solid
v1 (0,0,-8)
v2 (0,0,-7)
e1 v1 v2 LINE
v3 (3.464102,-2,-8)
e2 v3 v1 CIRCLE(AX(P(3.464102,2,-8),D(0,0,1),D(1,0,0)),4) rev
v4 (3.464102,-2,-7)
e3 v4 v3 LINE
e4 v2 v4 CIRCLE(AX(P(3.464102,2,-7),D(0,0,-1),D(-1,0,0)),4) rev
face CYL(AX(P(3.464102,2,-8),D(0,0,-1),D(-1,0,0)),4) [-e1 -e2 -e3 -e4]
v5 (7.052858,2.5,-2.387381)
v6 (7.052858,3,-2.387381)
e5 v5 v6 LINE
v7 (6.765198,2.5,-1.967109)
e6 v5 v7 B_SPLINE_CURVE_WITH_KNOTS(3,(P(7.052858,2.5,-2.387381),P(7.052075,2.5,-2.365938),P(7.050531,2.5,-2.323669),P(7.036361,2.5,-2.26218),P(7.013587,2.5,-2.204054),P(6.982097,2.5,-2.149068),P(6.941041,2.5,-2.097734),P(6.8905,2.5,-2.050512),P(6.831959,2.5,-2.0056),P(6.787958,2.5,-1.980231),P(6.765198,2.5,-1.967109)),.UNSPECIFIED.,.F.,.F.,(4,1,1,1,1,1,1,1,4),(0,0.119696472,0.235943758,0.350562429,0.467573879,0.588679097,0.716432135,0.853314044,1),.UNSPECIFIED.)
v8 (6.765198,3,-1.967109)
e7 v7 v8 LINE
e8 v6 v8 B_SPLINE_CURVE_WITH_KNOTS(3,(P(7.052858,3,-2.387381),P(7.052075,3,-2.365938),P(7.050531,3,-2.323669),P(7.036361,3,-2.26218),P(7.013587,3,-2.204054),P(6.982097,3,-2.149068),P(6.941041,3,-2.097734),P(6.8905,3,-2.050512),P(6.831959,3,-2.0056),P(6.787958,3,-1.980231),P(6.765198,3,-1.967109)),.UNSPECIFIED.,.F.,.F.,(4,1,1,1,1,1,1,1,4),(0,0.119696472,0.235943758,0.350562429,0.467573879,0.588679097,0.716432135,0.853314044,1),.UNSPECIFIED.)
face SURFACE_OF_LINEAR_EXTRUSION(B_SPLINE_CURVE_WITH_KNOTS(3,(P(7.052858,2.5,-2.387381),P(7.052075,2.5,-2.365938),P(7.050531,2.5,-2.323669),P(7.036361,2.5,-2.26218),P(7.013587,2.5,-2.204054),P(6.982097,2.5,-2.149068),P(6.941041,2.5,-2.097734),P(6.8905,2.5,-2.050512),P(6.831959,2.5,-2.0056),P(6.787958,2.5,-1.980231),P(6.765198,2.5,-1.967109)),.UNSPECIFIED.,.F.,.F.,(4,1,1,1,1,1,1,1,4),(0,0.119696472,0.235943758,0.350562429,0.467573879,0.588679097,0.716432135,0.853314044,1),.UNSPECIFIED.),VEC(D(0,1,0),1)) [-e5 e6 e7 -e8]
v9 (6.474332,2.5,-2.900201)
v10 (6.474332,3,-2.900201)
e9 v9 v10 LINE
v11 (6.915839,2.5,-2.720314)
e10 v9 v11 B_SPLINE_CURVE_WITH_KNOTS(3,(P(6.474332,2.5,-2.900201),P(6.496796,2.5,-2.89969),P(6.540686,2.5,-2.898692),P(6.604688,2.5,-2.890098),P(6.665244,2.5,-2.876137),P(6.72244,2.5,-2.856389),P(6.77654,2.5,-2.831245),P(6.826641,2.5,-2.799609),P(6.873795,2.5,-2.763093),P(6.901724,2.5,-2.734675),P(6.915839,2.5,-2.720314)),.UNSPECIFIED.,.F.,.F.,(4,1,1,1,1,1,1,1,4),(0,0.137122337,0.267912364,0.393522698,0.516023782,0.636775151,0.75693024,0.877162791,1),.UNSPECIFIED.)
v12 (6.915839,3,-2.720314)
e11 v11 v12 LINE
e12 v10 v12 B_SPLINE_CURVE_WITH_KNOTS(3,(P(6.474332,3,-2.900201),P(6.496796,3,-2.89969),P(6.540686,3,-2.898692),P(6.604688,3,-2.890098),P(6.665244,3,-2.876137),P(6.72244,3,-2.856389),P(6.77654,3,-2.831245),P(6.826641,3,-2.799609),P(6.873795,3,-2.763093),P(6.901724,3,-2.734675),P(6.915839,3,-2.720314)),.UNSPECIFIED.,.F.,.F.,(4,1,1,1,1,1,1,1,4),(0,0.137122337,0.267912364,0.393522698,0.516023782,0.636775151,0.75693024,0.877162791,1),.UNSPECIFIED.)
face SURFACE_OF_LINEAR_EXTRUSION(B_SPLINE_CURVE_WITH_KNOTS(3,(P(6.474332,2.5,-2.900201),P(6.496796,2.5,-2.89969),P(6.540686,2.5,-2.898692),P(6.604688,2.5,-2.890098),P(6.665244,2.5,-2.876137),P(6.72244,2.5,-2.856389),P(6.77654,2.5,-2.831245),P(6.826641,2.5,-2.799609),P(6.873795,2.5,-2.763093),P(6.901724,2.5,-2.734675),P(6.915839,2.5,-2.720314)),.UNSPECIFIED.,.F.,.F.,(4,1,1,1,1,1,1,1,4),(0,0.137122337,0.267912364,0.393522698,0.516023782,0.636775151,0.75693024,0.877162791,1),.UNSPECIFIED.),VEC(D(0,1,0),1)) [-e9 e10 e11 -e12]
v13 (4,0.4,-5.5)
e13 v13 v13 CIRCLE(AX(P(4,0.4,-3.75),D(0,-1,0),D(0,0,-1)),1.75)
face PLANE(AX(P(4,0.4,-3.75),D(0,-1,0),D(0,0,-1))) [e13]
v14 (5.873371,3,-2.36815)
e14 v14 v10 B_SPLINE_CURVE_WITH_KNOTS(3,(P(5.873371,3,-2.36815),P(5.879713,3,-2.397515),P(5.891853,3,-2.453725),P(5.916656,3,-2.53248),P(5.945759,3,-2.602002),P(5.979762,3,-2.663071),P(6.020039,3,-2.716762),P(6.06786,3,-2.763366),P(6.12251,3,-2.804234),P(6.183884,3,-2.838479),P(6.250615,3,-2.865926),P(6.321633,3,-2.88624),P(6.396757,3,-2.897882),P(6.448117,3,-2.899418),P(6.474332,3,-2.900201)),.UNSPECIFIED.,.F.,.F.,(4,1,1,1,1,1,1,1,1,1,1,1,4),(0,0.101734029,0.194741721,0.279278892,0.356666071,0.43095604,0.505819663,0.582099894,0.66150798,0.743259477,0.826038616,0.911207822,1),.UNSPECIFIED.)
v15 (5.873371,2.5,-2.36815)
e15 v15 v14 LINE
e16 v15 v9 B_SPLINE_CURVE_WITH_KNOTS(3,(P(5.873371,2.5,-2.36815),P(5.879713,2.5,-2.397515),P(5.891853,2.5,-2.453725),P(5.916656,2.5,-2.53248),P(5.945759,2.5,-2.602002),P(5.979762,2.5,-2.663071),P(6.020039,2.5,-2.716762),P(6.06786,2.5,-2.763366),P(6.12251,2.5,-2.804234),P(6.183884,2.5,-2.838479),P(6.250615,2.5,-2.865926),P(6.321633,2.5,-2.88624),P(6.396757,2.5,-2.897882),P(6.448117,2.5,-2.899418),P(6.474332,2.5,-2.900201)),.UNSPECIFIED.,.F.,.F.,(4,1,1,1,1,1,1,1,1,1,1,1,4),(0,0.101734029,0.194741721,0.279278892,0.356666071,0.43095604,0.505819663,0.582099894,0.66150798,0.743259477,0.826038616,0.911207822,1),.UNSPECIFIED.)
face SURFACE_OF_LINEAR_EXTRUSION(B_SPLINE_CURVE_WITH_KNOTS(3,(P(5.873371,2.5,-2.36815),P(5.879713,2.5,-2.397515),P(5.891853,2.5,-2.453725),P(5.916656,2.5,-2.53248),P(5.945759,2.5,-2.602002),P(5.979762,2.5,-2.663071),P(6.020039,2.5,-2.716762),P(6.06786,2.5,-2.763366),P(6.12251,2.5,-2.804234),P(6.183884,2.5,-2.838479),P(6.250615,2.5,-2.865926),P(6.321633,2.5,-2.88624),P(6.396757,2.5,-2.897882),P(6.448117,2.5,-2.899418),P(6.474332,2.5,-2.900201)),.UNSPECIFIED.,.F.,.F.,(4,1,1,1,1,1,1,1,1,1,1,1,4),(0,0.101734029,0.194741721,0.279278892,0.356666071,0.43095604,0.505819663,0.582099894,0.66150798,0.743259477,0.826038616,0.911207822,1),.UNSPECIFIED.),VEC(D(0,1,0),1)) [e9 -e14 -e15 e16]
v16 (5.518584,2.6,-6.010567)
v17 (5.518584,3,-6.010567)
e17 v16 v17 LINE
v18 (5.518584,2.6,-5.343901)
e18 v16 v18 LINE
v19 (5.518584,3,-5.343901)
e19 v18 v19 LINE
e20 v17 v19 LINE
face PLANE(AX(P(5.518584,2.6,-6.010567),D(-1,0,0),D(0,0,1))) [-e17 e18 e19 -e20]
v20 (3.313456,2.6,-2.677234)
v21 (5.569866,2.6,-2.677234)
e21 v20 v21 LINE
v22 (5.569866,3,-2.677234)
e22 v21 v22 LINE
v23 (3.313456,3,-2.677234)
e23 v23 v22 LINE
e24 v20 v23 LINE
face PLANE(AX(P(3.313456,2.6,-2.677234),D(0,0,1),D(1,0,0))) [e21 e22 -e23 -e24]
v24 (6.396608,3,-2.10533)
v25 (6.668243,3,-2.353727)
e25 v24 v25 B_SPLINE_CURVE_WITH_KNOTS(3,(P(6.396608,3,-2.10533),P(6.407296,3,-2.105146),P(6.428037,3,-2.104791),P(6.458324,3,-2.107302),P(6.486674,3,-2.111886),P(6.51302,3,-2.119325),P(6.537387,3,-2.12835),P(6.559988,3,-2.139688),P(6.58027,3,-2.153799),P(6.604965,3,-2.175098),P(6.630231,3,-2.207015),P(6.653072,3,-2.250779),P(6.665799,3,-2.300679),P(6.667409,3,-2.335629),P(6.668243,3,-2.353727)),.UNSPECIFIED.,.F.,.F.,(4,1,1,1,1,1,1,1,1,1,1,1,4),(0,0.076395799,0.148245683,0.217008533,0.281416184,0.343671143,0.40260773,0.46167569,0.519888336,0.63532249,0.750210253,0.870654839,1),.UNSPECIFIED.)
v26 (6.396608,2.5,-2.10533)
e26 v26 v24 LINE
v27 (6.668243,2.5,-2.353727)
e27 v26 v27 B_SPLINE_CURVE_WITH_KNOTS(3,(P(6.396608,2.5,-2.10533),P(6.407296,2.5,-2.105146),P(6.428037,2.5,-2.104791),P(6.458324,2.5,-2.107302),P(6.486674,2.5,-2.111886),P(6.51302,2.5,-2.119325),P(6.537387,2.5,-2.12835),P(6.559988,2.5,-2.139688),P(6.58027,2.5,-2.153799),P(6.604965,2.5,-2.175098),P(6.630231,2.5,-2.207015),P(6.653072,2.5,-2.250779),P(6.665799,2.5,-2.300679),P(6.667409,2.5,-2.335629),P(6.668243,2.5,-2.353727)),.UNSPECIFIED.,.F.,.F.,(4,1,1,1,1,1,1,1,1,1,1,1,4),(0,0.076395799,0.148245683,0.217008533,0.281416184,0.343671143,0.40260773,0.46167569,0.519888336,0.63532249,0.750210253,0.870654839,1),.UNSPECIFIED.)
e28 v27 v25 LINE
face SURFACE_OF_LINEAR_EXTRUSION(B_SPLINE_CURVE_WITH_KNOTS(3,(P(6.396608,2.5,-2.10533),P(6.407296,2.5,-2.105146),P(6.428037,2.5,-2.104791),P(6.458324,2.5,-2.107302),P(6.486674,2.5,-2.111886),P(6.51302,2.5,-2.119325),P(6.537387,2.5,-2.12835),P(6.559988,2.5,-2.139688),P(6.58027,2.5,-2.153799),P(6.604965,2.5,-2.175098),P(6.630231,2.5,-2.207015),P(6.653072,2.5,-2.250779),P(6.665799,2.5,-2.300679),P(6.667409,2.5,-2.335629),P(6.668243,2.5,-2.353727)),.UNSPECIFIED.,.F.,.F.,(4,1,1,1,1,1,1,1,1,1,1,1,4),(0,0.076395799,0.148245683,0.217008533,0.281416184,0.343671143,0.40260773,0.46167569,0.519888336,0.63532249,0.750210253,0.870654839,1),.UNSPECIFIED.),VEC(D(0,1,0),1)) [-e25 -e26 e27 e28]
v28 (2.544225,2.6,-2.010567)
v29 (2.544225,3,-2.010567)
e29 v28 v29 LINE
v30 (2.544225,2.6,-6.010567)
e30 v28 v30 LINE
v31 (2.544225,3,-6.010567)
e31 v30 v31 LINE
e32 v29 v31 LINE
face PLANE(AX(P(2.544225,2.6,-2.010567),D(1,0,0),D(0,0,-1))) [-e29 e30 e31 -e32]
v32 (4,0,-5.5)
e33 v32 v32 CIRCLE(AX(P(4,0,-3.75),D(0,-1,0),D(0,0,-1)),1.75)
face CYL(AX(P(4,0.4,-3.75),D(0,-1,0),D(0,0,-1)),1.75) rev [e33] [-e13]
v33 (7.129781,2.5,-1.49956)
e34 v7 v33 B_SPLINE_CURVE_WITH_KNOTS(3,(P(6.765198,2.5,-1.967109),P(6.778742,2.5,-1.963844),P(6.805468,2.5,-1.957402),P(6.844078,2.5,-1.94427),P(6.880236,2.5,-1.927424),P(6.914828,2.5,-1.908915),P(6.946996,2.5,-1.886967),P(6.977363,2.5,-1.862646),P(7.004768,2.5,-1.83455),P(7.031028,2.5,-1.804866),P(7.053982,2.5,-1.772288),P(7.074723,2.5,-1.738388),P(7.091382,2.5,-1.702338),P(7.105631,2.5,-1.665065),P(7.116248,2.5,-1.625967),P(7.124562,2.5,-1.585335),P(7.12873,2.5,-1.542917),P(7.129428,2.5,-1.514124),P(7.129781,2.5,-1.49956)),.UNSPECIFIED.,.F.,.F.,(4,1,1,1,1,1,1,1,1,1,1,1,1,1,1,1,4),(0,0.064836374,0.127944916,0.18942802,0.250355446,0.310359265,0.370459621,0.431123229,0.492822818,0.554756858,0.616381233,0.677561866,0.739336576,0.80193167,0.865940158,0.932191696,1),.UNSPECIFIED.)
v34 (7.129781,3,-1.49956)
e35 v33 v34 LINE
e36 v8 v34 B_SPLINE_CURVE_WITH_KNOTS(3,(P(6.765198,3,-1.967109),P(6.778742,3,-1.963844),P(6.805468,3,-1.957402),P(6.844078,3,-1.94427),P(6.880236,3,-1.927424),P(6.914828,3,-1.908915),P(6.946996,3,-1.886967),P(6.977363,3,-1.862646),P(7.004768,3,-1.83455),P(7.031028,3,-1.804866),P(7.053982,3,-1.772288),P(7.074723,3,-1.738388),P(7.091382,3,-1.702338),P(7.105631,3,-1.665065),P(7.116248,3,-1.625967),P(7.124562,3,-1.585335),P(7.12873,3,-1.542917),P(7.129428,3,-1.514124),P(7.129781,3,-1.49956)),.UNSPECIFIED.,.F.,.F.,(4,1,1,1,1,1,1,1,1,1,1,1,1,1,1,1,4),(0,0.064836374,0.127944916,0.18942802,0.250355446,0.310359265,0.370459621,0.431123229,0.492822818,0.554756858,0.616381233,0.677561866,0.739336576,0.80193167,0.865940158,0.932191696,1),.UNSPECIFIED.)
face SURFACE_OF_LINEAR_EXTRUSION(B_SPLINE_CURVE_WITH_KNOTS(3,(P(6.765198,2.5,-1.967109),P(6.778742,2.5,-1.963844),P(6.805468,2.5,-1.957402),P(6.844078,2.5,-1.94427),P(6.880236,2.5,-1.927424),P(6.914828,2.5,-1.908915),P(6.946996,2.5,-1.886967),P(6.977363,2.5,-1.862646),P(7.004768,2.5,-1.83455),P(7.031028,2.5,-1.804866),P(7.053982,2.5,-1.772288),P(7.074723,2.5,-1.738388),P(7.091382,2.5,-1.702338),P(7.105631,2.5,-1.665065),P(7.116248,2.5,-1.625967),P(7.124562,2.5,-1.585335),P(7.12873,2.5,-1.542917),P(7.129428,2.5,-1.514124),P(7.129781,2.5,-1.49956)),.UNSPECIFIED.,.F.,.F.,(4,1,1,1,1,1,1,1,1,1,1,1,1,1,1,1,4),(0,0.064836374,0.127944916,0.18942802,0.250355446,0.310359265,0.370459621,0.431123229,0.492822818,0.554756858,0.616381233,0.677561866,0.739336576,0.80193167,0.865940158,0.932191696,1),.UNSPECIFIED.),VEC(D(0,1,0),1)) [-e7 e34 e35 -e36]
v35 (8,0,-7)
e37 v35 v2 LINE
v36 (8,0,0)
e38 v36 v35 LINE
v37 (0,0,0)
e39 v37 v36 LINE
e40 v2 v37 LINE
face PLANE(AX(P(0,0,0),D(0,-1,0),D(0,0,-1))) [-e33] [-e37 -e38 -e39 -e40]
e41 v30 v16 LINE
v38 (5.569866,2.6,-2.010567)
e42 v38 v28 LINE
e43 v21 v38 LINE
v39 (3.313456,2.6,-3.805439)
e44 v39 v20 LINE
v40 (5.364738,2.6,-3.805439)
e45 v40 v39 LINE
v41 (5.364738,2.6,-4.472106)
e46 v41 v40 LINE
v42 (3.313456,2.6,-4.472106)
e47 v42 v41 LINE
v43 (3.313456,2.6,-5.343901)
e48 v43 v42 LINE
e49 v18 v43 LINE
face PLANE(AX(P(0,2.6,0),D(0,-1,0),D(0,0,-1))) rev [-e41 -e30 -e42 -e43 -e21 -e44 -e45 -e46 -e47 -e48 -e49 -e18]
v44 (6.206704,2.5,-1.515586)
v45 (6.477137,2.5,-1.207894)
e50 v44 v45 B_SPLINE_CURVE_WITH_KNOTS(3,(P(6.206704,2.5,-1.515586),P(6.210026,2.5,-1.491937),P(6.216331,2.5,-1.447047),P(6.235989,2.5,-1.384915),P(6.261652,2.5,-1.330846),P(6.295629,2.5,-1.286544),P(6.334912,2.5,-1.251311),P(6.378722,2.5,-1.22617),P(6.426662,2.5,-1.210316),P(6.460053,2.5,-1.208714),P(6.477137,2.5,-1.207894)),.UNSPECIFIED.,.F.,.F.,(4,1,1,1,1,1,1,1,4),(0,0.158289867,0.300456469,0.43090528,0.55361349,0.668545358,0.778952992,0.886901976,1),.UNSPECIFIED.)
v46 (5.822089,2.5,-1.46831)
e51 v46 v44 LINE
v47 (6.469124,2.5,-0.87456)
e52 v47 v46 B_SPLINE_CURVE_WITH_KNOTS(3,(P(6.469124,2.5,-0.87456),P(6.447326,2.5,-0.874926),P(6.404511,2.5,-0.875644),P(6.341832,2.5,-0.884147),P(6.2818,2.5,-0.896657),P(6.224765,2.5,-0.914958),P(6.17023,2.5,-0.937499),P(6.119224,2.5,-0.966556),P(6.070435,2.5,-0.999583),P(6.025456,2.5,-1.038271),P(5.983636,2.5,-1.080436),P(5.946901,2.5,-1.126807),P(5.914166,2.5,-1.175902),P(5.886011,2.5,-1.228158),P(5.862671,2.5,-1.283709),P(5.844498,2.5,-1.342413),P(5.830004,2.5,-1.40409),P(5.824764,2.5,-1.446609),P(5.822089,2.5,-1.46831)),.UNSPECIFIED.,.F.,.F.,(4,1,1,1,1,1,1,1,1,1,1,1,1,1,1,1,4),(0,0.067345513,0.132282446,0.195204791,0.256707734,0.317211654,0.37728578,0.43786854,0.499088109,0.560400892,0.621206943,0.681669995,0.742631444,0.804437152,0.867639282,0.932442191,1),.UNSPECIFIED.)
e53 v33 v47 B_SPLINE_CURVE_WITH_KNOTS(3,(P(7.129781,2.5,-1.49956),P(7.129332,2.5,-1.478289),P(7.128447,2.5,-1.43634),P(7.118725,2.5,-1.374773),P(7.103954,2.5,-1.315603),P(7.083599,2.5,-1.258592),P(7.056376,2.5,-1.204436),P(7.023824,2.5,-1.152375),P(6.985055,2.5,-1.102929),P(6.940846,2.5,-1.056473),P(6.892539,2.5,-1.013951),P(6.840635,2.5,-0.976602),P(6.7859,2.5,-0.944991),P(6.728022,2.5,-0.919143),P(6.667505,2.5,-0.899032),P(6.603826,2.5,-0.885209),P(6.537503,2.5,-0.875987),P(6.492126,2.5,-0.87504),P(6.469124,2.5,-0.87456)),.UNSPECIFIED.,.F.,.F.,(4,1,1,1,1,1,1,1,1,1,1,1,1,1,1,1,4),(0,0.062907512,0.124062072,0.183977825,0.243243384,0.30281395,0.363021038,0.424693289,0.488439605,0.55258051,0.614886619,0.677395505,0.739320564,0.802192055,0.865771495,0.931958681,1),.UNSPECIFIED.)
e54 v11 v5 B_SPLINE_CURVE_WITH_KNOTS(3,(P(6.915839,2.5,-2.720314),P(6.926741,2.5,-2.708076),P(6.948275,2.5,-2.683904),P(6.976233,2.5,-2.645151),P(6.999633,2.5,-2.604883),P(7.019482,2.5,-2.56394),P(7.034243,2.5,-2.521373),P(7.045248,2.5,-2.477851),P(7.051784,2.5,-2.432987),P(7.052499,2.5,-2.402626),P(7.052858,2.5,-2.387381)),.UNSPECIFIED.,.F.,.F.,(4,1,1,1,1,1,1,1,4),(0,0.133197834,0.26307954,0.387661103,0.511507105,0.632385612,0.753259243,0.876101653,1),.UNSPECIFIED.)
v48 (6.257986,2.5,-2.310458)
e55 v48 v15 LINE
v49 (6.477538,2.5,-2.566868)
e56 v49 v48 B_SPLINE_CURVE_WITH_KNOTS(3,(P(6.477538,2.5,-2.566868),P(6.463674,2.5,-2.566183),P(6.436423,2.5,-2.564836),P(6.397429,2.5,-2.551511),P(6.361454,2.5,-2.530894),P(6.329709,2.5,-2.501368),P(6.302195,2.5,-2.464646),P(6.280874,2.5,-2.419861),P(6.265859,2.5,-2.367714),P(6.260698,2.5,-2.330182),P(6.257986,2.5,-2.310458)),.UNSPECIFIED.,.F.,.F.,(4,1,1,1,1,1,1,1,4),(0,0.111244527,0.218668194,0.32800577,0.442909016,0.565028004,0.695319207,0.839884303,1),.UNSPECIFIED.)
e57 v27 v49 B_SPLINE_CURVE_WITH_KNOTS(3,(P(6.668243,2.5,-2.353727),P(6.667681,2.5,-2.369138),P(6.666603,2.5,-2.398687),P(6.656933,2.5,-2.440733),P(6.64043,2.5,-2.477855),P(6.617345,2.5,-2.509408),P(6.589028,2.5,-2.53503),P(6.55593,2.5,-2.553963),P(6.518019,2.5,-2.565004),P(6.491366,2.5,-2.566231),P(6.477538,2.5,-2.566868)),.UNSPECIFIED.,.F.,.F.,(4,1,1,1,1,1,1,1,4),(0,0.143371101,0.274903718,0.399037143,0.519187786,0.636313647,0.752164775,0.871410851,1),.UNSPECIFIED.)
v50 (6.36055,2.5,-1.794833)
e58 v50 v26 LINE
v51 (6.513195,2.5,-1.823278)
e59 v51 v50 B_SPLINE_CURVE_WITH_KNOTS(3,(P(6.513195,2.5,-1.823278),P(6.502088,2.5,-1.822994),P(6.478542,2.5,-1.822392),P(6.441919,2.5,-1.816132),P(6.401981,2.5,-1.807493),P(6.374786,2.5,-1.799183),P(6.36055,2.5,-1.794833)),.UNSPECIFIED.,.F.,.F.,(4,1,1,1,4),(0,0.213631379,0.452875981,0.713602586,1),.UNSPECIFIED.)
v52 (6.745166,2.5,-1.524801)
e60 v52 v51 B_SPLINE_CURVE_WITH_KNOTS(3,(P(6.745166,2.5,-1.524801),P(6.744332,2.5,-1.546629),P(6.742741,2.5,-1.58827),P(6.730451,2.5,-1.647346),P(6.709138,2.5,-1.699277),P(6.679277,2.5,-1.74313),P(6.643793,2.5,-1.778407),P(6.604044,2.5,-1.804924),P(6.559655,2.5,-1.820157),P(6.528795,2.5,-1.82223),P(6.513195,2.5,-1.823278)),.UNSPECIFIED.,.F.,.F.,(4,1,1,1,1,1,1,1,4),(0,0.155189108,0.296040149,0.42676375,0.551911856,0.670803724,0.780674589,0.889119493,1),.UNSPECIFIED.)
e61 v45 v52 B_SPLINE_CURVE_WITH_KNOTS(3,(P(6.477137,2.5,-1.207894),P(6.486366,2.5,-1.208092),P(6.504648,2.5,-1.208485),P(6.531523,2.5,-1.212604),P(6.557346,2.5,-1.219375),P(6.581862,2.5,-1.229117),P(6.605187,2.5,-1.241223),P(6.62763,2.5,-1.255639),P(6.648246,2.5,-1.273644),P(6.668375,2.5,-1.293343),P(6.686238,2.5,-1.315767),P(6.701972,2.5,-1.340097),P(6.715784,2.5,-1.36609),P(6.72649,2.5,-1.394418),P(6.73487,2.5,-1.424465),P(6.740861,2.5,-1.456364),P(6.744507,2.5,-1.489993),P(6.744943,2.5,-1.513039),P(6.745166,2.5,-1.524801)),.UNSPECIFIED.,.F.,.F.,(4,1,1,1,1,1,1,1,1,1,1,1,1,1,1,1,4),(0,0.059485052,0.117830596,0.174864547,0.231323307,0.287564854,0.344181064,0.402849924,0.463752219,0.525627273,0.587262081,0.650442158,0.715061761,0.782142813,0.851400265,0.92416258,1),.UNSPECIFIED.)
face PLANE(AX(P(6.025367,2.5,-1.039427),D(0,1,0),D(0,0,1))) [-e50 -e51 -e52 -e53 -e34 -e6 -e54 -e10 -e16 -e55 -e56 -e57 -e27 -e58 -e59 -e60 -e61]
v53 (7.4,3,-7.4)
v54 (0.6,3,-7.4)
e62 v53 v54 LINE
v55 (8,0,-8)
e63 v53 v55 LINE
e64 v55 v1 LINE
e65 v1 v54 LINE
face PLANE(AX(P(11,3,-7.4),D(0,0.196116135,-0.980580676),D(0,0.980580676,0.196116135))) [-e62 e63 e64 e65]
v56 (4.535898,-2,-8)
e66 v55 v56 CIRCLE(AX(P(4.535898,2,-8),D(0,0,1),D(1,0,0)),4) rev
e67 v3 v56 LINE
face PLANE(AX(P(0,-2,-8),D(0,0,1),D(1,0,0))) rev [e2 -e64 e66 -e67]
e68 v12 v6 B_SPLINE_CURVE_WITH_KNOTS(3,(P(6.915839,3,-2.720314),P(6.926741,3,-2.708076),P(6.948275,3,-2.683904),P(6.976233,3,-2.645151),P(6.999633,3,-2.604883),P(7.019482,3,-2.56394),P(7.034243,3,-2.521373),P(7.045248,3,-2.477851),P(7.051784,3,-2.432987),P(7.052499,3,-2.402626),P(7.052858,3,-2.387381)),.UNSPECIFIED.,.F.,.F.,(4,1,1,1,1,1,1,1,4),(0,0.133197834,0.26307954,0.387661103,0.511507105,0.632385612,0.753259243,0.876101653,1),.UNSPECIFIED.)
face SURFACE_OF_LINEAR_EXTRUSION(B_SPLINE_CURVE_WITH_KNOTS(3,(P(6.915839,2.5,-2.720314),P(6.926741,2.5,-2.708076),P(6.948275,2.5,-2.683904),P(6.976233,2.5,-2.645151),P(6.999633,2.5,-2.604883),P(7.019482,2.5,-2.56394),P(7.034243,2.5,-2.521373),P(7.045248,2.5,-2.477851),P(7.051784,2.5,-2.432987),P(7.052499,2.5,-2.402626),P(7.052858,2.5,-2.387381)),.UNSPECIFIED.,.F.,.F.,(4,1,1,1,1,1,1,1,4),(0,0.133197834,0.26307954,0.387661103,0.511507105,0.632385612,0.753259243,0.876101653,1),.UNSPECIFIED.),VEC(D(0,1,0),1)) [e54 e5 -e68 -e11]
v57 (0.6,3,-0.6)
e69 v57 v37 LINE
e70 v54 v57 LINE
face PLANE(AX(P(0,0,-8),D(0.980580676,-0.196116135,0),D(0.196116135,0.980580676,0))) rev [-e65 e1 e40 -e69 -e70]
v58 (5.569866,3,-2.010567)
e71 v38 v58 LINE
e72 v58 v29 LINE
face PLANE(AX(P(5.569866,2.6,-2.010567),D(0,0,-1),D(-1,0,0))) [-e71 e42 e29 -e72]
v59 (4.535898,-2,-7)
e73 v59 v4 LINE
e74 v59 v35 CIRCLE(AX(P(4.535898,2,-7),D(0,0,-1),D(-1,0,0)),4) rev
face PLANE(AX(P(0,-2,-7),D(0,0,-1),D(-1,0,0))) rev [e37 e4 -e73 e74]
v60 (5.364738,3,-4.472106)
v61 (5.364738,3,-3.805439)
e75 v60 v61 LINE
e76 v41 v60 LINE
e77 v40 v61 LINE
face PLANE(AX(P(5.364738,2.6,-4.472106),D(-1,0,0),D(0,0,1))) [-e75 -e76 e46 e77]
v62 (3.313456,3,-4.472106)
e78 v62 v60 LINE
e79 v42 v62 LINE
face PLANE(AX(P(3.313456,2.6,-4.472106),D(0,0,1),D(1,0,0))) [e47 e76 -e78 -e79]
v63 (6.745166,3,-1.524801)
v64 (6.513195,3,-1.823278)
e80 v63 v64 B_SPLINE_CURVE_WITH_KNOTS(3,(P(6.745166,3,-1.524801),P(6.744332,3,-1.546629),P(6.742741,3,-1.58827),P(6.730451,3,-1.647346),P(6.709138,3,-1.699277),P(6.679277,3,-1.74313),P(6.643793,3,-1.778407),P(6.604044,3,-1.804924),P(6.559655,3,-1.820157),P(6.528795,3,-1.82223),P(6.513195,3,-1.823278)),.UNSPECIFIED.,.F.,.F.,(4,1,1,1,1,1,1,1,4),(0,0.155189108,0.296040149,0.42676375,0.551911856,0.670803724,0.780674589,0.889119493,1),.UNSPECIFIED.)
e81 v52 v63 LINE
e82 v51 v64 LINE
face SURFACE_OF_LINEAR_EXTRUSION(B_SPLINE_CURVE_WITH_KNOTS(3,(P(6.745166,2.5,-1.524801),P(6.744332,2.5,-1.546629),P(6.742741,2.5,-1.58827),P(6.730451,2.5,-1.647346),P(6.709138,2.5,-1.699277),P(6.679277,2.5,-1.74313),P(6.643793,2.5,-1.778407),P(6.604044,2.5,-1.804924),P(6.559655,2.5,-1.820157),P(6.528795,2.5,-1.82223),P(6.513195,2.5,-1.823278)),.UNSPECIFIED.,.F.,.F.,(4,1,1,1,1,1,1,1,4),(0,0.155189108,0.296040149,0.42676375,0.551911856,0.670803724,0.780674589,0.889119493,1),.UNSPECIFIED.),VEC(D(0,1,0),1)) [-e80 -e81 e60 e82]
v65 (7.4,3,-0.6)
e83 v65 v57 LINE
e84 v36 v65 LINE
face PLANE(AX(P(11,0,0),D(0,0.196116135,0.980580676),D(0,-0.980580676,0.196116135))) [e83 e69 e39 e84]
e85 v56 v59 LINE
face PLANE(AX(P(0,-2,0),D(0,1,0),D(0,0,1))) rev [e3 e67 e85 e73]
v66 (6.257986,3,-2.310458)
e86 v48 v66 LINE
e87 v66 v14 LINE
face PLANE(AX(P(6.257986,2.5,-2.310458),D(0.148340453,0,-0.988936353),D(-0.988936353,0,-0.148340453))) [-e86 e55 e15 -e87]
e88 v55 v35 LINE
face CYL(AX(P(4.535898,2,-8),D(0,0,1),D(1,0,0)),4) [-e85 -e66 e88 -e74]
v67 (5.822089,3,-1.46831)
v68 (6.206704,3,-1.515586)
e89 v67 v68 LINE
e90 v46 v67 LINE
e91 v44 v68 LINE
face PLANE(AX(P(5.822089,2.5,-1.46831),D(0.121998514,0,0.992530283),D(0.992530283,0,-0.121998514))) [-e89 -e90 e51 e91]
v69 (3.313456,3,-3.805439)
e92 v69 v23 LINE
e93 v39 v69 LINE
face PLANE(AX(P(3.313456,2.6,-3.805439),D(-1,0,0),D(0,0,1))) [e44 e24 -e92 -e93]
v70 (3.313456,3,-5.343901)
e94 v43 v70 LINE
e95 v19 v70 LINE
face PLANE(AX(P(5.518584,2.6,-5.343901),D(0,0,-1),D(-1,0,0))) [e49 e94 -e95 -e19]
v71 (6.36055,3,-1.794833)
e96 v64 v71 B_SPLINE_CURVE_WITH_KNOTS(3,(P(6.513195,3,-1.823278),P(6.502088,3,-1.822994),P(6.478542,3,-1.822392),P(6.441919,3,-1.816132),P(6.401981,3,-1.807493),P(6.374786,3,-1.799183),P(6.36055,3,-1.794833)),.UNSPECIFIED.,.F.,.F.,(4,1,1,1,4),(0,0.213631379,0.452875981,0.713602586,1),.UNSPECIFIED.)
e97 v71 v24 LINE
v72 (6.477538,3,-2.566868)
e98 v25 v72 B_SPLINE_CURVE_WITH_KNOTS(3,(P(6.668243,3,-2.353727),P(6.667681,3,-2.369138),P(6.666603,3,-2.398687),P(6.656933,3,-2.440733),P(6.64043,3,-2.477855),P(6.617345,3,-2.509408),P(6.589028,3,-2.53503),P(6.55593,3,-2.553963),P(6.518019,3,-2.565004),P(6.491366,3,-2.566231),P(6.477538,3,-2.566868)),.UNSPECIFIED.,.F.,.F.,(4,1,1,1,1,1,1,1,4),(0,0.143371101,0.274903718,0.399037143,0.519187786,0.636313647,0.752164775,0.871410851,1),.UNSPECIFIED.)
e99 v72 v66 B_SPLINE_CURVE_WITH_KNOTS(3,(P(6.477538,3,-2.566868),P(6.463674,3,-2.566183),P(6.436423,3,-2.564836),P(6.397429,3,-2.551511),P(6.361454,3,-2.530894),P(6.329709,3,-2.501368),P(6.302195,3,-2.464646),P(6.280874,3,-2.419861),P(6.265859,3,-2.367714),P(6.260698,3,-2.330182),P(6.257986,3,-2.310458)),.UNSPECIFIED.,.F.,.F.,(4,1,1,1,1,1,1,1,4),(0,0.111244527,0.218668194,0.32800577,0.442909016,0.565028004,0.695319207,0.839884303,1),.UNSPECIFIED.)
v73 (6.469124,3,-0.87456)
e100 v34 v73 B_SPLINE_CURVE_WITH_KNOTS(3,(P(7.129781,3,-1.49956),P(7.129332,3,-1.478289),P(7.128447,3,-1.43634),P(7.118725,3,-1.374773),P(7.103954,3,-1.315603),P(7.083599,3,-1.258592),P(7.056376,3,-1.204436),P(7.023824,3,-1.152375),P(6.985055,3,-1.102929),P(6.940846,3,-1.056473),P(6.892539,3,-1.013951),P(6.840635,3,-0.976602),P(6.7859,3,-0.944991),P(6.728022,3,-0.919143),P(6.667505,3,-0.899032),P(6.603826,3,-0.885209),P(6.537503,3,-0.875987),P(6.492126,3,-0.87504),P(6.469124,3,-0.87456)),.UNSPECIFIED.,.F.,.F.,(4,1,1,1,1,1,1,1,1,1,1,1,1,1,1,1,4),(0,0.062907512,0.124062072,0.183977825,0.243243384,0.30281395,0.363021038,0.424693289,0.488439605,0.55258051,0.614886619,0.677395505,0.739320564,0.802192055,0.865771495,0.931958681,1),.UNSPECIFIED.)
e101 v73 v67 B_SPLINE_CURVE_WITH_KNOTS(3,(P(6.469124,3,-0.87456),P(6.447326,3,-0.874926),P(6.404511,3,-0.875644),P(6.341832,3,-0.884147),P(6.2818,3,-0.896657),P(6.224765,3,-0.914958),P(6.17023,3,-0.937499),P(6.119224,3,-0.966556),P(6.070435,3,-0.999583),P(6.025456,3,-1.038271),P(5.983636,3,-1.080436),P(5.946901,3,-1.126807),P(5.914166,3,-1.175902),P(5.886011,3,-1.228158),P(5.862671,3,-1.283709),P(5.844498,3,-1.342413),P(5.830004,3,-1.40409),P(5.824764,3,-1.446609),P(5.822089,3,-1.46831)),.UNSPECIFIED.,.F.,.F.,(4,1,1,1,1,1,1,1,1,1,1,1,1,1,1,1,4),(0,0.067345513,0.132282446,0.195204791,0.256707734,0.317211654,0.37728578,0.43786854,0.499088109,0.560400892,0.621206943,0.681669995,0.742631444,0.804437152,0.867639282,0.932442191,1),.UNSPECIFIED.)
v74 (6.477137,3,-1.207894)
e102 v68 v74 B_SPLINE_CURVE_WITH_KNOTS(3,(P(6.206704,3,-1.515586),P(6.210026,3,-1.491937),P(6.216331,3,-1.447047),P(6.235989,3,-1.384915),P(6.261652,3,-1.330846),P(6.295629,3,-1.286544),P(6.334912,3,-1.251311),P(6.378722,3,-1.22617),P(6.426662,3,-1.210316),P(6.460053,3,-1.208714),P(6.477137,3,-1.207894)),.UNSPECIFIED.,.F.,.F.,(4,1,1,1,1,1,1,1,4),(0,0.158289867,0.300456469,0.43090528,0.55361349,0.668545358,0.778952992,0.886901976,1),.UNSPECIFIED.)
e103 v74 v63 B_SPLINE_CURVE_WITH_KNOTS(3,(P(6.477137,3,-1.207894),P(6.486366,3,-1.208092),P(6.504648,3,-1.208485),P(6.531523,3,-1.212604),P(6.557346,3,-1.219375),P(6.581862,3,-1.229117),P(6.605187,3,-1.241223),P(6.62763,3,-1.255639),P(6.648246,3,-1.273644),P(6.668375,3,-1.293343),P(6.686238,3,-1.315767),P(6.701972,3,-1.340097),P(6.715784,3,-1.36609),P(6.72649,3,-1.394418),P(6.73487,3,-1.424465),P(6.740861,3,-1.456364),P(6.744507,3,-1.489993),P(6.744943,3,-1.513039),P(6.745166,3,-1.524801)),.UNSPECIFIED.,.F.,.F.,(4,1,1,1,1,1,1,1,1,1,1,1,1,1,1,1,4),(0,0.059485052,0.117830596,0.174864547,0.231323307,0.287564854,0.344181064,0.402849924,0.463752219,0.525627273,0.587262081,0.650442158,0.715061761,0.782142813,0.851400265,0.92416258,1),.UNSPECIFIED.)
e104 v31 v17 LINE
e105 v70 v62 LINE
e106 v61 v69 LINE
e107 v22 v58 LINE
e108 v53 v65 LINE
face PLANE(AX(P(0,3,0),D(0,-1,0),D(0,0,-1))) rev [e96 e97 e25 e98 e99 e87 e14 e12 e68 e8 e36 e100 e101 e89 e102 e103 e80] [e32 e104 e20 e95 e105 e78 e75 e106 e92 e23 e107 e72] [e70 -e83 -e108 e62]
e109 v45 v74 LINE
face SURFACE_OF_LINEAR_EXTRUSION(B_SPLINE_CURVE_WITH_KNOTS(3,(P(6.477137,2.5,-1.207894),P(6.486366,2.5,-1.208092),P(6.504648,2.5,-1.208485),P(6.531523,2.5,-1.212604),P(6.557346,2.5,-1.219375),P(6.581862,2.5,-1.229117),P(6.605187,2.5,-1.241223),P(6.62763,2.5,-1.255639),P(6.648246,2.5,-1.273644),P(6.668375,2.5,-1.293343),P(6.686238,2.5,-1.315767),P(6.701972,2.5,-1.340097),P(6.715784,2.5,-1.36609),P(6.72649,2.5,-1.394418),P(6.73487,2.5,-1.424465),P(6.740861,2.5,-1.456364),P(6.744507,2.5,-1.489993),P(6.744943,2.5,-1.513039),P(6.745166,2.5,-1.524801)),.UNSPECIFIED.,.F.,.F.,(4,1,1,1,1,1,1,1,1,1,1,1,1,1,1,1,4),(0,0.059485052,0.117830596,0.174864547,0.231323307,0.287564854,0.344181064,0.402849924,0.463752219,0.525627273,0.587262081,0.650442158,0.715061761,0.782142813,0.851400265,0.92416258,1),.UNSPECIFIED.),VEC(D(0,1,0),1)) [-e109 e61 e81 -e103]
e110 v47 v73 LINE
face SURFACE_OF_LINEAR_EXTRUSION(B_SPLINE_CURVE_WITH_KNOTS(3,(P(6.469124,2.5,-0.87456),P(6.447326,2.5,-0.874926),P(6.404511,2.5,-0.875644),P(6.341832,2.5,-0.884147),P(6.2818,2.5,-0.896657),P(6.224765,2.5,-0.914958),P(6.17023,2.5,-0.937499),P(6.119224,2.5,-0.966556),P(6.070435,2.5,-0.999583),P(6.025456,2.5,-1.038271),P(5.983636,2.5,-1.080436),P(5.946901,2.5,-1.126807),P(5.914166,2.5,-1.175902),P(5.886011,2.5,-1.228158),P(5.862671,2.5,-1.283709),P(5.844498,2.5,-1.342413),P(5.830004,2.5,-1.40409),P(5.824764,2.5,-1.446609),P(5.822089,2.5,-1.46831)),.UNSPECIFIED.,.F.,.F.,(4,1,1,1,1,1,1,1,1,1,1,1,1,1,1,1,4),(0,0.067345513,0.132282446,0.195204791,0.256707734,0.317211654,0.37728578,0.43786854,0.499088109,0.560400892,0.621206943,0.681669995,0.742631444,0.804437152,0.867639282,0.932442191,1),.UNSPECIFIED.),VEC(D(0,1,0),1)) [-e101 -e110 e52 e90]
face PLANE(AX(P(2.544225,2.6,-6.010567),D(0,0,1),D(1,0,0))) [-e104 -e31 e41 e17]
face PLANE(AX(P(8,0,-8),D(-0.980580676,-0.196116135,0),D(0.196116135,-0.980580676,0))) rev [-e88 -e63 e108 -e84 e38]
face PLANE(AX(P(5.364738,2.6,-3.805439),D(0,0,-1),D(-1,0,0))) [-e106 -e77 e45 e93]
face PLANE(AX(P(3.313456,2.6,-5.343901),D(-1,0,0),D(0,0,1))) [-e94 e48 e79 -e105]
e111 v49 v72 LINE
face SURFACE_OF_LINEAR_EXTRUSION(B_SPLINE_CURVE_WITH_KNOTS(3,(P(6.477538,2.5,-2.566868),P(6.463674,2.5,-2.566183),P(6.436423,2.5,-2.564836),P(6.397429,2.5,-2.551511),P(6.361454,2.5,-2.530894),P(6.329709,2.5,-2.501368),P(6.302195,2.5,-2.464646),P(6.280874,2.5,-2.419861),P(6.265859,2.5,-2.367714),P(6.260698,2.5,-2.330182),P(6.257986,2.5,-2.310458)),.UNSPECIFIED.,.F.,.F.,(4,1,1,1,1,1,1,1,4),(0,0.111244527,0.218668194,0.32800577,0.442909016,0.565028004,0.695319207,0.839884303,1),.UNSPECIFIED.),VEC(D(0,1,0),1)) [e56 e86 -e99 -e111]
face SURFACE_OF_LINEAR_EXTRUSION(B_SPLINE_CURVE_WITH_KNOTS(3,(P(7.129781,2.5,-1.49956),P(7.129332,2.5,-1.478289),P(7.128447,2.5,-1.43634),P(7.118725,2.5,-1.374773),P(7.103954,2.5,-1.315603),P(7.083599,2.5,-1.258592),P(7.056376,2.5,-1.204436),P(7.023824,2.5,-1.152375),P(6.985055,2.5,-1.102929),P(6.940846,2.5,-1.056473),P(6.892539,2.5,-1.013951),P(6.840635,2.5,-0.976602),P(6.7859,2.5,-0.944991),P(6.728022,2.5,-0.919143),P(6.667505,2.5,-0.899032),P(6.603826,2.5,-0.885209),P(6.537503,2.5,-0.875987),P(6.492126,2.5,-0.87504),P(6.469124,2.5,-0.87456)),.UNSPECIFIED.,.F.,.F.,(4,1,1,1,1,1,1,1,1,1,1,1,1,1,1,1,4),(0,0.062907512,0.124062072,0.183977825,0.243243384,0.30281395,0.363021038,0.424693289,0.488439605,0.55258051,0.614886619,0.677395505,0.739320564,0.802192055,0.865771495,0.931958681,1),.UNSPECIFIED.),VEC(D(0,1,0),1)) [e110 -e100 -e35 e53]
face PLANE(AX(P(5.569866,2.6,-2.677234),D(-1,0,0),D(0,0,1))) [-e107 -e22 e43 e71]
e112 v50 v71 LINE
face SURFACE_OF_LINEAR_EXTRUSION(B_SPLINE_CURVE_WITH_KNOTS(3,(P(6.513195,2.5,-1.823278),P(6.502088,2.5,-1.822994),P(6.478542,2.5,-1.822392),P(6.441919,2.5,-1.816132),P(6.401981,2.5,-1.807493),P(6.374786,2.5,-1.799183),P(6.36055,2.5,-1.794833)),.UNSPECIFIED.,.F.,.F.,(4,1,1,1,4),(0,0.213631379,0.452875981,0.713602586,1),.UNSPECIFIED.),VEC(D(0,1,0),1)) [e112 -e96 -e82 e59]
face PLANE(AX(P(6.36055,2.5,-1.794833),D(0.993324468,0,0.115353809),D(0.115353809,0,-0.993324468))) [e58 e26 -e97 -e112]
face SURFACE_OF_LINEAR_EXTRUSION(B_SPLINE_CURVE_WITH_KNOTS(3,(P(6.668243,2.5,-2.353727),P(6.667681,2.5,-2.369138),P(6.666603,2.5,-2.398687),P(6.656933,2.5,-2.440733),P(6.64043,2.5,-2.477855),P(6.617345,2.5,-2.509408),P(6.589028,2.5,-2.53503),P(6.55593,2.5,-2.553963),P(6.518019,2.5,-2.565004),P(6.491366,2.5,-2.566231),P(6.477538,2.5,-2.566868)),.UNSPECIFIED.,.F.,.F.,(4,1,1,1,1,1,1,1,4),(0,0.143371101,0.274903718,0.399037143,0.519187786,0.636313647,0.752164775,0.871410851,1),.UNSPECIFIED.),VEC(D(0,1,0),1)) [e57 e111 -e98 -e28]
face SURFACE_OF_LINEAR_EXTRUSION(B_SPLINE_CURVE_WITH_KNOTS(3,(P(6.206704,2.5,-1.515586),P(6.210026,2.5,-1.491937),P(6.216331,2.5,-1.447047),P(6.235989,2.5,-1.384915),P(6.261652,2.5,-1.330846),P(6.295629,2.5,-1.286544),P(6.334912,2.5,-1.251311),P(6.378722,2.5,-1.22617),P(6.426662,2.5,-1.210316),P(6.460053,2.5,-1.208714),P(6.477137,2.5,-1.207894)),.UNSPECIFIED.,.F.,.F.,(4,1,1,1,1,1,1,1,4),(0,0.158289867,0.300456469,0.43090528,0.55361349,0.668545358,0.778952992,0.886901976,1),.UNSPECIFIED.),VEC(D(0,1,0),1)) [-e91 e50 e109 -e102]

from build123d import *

# Parameters (mm, degrees)
SKETCH1_W               = 8
SKETCH1_H               = 8
BOSS_EXTRUDE1_DEPTH     = 3
CUT_EXTRUDE1_DEPTH      = 12.704699911
CUT_EXTRUDE1_DEPTH_BACK = 12.704699911
CUT_EXTRUDE2_DEPTH      = 11
SKETCH4_R               = 1.75
CUT_EXTRUDE3_DEPTH      = 0.4
SKETCH5_W               = 8
SKETCH5_H               = 1
BOSS_EXTRUDE2_DEPTH     = 2
FILLET1_R               = 4
CUT_EXTRUDE4_DEPTH      = 0.4
CUT_EXTRUDE5_DEPTH      = 0.5


with BuildPart() as part:
    # Sketch1 → Boss-Extrude1 (new body)
    with BuildSketch(Plane(origin=(0, 0, 0), x_dir=(1, 0, 0), z_dir=(0, 1, 0))):
        with Locations((4, 4)):
            Rectangle(SKETCH1_W, SKETCH1_H)
    extrude(amount=BOSS_EXTRUDE1_DEPTH)

    # Sketch2 → Cut-Extrude1 (cut, two sides: drawn at the far end of the back side and taken through both)
    with BuildSketch(Plane.XY.offset(-CUT_EXTRUDE1_DEPTH_BACK)):
        Polygon((0, 0), (0.6, 3), (0, 3), align=None)
        Polygon((8, 0), (7.4, 3), (8, 3), align=None)
    extrude(amount=CUT_EXTRUDE1_DEPTH + CUT_EXTRUDE1_DEPTH_BACK, mode=Mode.SUBTRACT)

    # Sketch3 → Cut-Extrude2 (cut)
    with BuildSketch(Plane(origin=(0, 0, 0), x_dir=(0, 0, -1), z_dir=(1, 0, 0))):
        Polygon((0, 0), (0.6, 3), (0, 3), align=None)
        Polygon((8, 3), (7.4, 3), (8, 0), align=None)
    extrude(amount=CUT_EXTRUDE2_DEPTH, mode=Mode.SUBTRACT)

    # Sketch4 → Cut-Extrude3 (cut)
    with BuildSketch(Plane.XZ):
        with Locations(Location((4, -3.75, 0), (0, 0, 270))):
            Circle(SKETCH4_R)
    extrude(amount=-CUT_EXTRUDE3_DEPTH, mode=Mode.SUBTRACT)

    # Sketch5 → Boss-Extrude2 (add)
    with BuildSketch(Plane.XZ):
        with Locations((4, -7.5)):
            Rectangle(SKETCH5_W, SKETCH5_H)
    extrude(amount=BOSS_EXTRUDE2_DEPTH)

    # Fillet1
    # the kernel refuses this fillet: 4 mm, written as the material it takes off along each edge
    with BuildSketch(Plane(origin=(8, -2, -16.660254038), x_dir=(0, 1, 0), z_dir=(0, 0, 1)), Plane(origin=(0, -2, 1.660254038), x_dir=(0, 1, 0), z_dir=(0, 0, -1))) as fillet1_piece_1:
        with BuildLine():
            CenterArc((4, 3.464101615), FILLET1_R, 180, 60)
            Line((0, 3.464101615), (-0.08, 3.464101615))
            Line((-0.08, 3.464101615), (-0.08, 0))
            Line((-0.08, 0), (0, -0.08))
            ThreePointArc((0, -0.08), (1, -0.08), (1.96, -0.069282032))
            Line((1.96, -0.069282032), (2, 0))
        make_face()
    extrude(amount=18.320508076, mode=Mode.SUBTRACT)

    # Sketch6 → Cut-Extrude4 (cut)
    with BuildSketch(Plane(origin=(0, 3, 0), x_dir=(1, 0, 0), z_dir=(0, 1, 0))):
        Polygon((2.544225106, 2.010567225), (2.544225106, 6.010567225), (5.51858408, 6.010567225), (5.51858408, 5.343900558), (3.313455875, 5.343900558), (3.313455875, 4.472105686), (5.364737926, 4.472105686), (5.364737926, 3.80543902), (3.313455875, 3.80543902), (3.313455875, 2.677233891), (5.569866131, 2.677233891), (5.569866131, 2.010567225), align=None)
    extrude(amount=-CUT_EXTRUDE4_DEPTH, mode=Mode.SUBTRACT)

    # Sketch7 → Cut-Extrude5 (cut)
    with BuildSketch(Plane(origin=(0, 3, 0), x_dir=(1, 0, 0), z_dir=(0, 1, 0))):
        with BuildLine():
            Line((5.822088817, 1.468310464), (6.206704202, 1.515586105))
            add(Edge.make_bspline(
                [(6.206704202, 1.515586105), (6.210025755, 1.491936921), (6.21633053, 1.447047438), (6.235989072, 1.384914698), (6.261652315, 1.330845836), (6.295629161, 1.286544364), (6.334912115, 1.251310519), (6.37872169, 1.226169889), (6.426661607, 1.210315729), (6.460052531, 1.208713548), (6.477136894, 1.207893797)],
                knots=[0, 0, 0, 0, 1.26631894, 2.403651751, 3.447242243, 4.428907923, 5.348362865, 6.231623936, 7.095215805, 8, 8, 8, 8], degree=3))
            add(Edge.make_bspline(
                [(6.477136894, 1.207893797), (6.486366298, 1.208091994), (6.504648304, 1.20848459), (6.531523321, 1.212603697), (6.557345996, 1.219374529), (6.58186155, 1.229117251), (6.605187017, 1.241222715), (6.627629553, 1.255638676), (6.648246393, 1.273643613), (6.668375088, 1.29334292), (6.68623752, 1.315767324), (6.701972196, 1.340096861), (6.715784117, 1.366090219), (6.726489771, 1.394417604), (6.734869896, 1.424465406), (6.740860884, 1.456364057), (6.744506994, 1.489993317), (6.74494315, 1.513039367), (6.74516574, 1.524800849)],
                knots=[0, 0, 0, 0, 0.951760839, 1.885289532, 2.797832748, 3.70117291, 4.60103766, 5.506897018, 6.445598779, 7.420035506, 8.410036365, 9.396193293, 10.407074535, 11.440988179, 12.514285005, 13.622404236, 14.786601276, 16, 16, 16, 16], degree=3))
            add(Edge.make_bspline(
                [(6.74516574, 1.524800849), (6.744331981, 1.546629456), (6.742741494, 1.588269906), (6.730451294, 1.647346431), (6.709137892, 1.699277092), (6.679276772, 1.743130281), (6.643793264, 1.778406879), (6.604044422, 1.8049236), (6.559654571, 1.820157256), (6.528795478, 1.822230353), (6.513194586, 1.823278413)],
                knots=[0, 0, 0, 0, 1.241512862, 2.368321189, 3.414110003, 4.41529485, 5.36642979, 6.245396713, 7.112955941, 8, 8, 8, 8], degree=3))
            add(Edge.make_bspline(
                [(6.513194586, 1.823278413), (6.502087722, 1.822994208), (6.47854234, 1.822391724), (6.441918774, 1.81613185), (6.401980616, 1.80749294), (6.374785766, 1.799182881), (6.360550356, 1.7948329)],
                knots=[0, 0, 0, 0, 0.854525515, 1.811503923, 2.854410343, 4, 4, 4, 4], degree=3))
            Line((6.360550356, 1.7948329), (6.396608048, 2.105329695))
            add(Edge.make_bspline(
                [(6.396608048, 2.105329695), (6.407296254, 2.105146348), (6.428036665, 2.104790564), (6.458323888, 2.107301653), (6.486673662, 2.111886341), (6.513019839, 2.119324972), (6.53738695, 2.128349551), (6.559988104, 2.139688262), (6.580270378, 2.153798702), (6.604965361, 2.175098338), (6.630230561, 2.207014566), (6.6530719, 2.250778884), (6.665798637, 2.300679459), (6.667408863, 2.335629458), (6.668242663, 2.353727131)],
                knots=[0, 0, 0, 0, 0.916749589, 1.778948191, 2.604102396, 3.376994206, 4.124053722, 4.831292757, 5.54010828, 6.238660037, 7.62386988, 9.002523041, 10.447858069, 12, 12, 12, 12], degree=3))
            add(Edge.make_bspline(
                [(6.668242663, 2.353727131), (6.667680515, 2.36913782), (6.666602635, 2.398686702), (6.656933325, 2.440733393), (6.640429824, 2.477855418), (6.617345194, 2.50940841), (6.589028098, 2.535030406), (6.555929861, 2.553963194), (6.518019093, 2.565003531), (6.491366313, 2.566231188), (6.477537535, 2.566868156)],
                knots=[0, 0, 0, 0, 1.146968804, 2.199229744, 3.192297141, 4.153502289, 5.090509175, 6.0173182, 6.971286811, 8, 8, 8, 8], degree=3))
            add(Edge.make_bspline(
                [(6.477537535, 2.566868156), (6.463673911, 2.566182836), (6.436422829, 2.564835732), (6.397428508, 2.551510744), (6.361454157, 2.530893795), (6.329709376, 2.501368407), (6.302195486, 2.464646404), (6.280874208, 2.419861118), (6.265858745, 2.367714197), (6.260698213, 2.33018187), (6.257986253, 2.3104579)],
                knots=[0, 0, 0, 0, 0.889956214, 1.749345552, 2.62404616, 3.543272128, 4.520224035, 5.562553653, 6.719074424, 8, 8, 8, 8], degree=3))
            Line((6.257986253, 2.3104579), (5.873370869, 2.368150208))
            add(Edge.make_bspline(
                [(5.873370869, 2.368150208), (5.879712758, 2.397514751), (5.891852554, 2.453725064), (5.916656, 2.532479948), (5.945759151, 2.602002338), (5.979761878, 2.663071325), (6.020038823, 2.716762155), (6.067859884, 2.763365742), (6.122509575, 2.804234412), (6.183883545, 2.838478774), (6.250614825, 2.865925856), (6.321633047, 2.886240153), (6.396757082, 2.897882068), (6.448117417, 2.899417689), (6.474332407, 2.90020149)],
                knots=[0, 0, 0, 0, 1.220808349, 2.336900656, 3.3513467, 4.279992853, 5.171472476, 6.069835959, 6.985198729, 7.938095762, 8.919113729, 9.91246339, 10.934493858, 12, 12, 12, 12], degree=3))
            add(Edge.make_bspline(
                [(6.474332407, 2.90020149), (6.496795991, 2.899690329), (6.540685792, 2.898691614), (6.604687523, 2.890097866), (6.665244055, 2.876137228), (6.722439804, 2.856388937), (6.776539911, 2.831244798), (6.826641223, 2.799609265), (6.873794781, 2.763093379), (6.901724377, 2.73467508), (6.915838817, 2.720313669)],
                knots=[0, 0, 0, 0, 1.096978699, 2.143298912, 3.148181587, 4.128190255, 5.094201205, 6.055441919, 7.017302331, 8, 8, 8, 8], degree=3))
            add(Edge.make_bspline(
                [(6.915838817, 2.720313669), (6.926741328, 2.708075606), (6.948274918, 2.683904162), (6.976233385, 2.645150995), (6.999633117, 2.604882958), (7.019482141, 2.563940258), (7.034243104, 2.52137348), (7.04524752, 2.477850813), (7.051783755, 2.43298662), (7.05249893, 2.402626167), (7.052858048, 2.387380977)],
                knots=[0, 0, 0, 0, 1.065582675, 2.104636323, 3.101288825, 4.092056841, 5.059084899, 6.026073946, 7.008813224, 8, 8, 8, 8], degree=3))
            add(Edge.make_bspline(
                [(7.052858048, 2.387380977), (7.052074688, 2.365937591), (7.050530541, 2.323668734), (7.036361111, 2.262180096), (7.013586987, 2.204054017), (6.982096895, 2.149068456), (6.941041129, 2.097733658), (6.890499978, 2.050511525), (6.831958555, 2.005600039), (6.787958464, 1.980231405), (6.765197792, 1.967108541)],
                knots=[0, 0, 0, 0, 0.957571776, 1.887550067, 2.804499428, 3.740591036, 4.709432777, 5.731457079, 6.826512349, 8, 8, 8, 8], degree=3))
            add(Edge.make_bspline(
                [(6.765197792, 1.967108541), (6.778741549, 1.963844189), (6.805468134, 1.957402478), (6.844077906, 1.94426987), (6.880236126, 1.927424278), (6.914828375, 1.908914943), (6.946996208, 1.886966635), (6.977363151, 1.862646466), (7.00476785, 1.834549826), (7.03102769, 1.804865641), (7.053982146, 1.772288453), (7.074722978, 1.738388398), (7.091382436, 1.702338355), (7.105631297, 1.665065232), (7.116248441, 1.625966572), (7.124562393, 1.585334894), (7.128729622, 1.542917296), (7.129427921, 1.514124194), (7.129781125, 1.499560464)],
                knots=[0, 0, 0, 0, 1.037381978, 2.047118658, 3.030848314, 4.005687143, 4.965748246, 5.927353932, 6.897971669, 7.885165084, 8.876109723, 9.862099733, 10.840989857, 11.829385213, 12.830906716, 13.855042526, 14.915067134, 16, 16, 16, 16], degree=3))
            add(Edge.make_bspline(
                [(7.129781125, 1.499560464), (7.129332308, 1.478289376), (7.12844718, 1.43633993), (7.11872513, 1.374773186), (7.10395436, 1.3156035), (7.083598929, 1.25859183), (7.056376257, 1.204435717), (7.023823759, 1.152375398), (6.985054773, 1.102929453), (6.940845684, 1.056472589), (6.892539484, 1.013951446), (6.84063463, 0.97660242), (6.785900139, 0.944991177), (6.728022396, 0.9191431), (6.667504686, 0.899031537), (6.603826037, 0.885208987), (6.537502989, 0.875987213), (6.49212598, 0.875040406), (6.469124074, 0.874560464)],
                knots=[0, 0, 0, 0, 1.006520189, 1.984993146, 2.943645202, 3.891894145, 4.845023195, 5.808336607, 6.795092628, 7.815033679, 8.841288157, 9.838185905, 10.83832808, 11.829129029, 12.835072876, 13.85234392, 14.911338897, 16, 16, 16, 16], degree=3))
            add(Edge.make_bspline(
                [(6.469124074, 0.874560464), (6.447326457, 0.874925903), (6.404510806, 0.875643711), (6.341832261, 0.884147308), (6.281800208, 0.896657101), (6.224765045, 0.914957582), (6.170229951, 0.937498647), (6.119224255, 0.966556317), (6.070434994, 0.999582769), (6.02545616, 1.03827062), (5.983635573, 1.080436419), (5.946901196, 1.126807021), (5.914165969, 1.175902437), (5.886010541, 1.228157933), (5.862670856, 1.283709297), (5.844497682, 1.342413141), (5.830004226, 1.404089696), (5.824763645, 1.446608551), (5.822088817, 1.468310464)],
                knots=[0, 0, 0, 0, 1.077528213, 2.11651914, 3.123276654, 4.10732375, 5.075386463, 6.036572488, 7.005896639, 7.98540975, 8.966414275, 9.939311093, 10.906719916, 11.882103104, 12.870994428, 13.882228509, 14.919075059, 16, 16, 16, 16], degree=3))
        make_face()
    extrude(amount=-CUT_EXTRUDE5_DEPTH, mode=Mode.SUBTRACT)


solid = part.part
